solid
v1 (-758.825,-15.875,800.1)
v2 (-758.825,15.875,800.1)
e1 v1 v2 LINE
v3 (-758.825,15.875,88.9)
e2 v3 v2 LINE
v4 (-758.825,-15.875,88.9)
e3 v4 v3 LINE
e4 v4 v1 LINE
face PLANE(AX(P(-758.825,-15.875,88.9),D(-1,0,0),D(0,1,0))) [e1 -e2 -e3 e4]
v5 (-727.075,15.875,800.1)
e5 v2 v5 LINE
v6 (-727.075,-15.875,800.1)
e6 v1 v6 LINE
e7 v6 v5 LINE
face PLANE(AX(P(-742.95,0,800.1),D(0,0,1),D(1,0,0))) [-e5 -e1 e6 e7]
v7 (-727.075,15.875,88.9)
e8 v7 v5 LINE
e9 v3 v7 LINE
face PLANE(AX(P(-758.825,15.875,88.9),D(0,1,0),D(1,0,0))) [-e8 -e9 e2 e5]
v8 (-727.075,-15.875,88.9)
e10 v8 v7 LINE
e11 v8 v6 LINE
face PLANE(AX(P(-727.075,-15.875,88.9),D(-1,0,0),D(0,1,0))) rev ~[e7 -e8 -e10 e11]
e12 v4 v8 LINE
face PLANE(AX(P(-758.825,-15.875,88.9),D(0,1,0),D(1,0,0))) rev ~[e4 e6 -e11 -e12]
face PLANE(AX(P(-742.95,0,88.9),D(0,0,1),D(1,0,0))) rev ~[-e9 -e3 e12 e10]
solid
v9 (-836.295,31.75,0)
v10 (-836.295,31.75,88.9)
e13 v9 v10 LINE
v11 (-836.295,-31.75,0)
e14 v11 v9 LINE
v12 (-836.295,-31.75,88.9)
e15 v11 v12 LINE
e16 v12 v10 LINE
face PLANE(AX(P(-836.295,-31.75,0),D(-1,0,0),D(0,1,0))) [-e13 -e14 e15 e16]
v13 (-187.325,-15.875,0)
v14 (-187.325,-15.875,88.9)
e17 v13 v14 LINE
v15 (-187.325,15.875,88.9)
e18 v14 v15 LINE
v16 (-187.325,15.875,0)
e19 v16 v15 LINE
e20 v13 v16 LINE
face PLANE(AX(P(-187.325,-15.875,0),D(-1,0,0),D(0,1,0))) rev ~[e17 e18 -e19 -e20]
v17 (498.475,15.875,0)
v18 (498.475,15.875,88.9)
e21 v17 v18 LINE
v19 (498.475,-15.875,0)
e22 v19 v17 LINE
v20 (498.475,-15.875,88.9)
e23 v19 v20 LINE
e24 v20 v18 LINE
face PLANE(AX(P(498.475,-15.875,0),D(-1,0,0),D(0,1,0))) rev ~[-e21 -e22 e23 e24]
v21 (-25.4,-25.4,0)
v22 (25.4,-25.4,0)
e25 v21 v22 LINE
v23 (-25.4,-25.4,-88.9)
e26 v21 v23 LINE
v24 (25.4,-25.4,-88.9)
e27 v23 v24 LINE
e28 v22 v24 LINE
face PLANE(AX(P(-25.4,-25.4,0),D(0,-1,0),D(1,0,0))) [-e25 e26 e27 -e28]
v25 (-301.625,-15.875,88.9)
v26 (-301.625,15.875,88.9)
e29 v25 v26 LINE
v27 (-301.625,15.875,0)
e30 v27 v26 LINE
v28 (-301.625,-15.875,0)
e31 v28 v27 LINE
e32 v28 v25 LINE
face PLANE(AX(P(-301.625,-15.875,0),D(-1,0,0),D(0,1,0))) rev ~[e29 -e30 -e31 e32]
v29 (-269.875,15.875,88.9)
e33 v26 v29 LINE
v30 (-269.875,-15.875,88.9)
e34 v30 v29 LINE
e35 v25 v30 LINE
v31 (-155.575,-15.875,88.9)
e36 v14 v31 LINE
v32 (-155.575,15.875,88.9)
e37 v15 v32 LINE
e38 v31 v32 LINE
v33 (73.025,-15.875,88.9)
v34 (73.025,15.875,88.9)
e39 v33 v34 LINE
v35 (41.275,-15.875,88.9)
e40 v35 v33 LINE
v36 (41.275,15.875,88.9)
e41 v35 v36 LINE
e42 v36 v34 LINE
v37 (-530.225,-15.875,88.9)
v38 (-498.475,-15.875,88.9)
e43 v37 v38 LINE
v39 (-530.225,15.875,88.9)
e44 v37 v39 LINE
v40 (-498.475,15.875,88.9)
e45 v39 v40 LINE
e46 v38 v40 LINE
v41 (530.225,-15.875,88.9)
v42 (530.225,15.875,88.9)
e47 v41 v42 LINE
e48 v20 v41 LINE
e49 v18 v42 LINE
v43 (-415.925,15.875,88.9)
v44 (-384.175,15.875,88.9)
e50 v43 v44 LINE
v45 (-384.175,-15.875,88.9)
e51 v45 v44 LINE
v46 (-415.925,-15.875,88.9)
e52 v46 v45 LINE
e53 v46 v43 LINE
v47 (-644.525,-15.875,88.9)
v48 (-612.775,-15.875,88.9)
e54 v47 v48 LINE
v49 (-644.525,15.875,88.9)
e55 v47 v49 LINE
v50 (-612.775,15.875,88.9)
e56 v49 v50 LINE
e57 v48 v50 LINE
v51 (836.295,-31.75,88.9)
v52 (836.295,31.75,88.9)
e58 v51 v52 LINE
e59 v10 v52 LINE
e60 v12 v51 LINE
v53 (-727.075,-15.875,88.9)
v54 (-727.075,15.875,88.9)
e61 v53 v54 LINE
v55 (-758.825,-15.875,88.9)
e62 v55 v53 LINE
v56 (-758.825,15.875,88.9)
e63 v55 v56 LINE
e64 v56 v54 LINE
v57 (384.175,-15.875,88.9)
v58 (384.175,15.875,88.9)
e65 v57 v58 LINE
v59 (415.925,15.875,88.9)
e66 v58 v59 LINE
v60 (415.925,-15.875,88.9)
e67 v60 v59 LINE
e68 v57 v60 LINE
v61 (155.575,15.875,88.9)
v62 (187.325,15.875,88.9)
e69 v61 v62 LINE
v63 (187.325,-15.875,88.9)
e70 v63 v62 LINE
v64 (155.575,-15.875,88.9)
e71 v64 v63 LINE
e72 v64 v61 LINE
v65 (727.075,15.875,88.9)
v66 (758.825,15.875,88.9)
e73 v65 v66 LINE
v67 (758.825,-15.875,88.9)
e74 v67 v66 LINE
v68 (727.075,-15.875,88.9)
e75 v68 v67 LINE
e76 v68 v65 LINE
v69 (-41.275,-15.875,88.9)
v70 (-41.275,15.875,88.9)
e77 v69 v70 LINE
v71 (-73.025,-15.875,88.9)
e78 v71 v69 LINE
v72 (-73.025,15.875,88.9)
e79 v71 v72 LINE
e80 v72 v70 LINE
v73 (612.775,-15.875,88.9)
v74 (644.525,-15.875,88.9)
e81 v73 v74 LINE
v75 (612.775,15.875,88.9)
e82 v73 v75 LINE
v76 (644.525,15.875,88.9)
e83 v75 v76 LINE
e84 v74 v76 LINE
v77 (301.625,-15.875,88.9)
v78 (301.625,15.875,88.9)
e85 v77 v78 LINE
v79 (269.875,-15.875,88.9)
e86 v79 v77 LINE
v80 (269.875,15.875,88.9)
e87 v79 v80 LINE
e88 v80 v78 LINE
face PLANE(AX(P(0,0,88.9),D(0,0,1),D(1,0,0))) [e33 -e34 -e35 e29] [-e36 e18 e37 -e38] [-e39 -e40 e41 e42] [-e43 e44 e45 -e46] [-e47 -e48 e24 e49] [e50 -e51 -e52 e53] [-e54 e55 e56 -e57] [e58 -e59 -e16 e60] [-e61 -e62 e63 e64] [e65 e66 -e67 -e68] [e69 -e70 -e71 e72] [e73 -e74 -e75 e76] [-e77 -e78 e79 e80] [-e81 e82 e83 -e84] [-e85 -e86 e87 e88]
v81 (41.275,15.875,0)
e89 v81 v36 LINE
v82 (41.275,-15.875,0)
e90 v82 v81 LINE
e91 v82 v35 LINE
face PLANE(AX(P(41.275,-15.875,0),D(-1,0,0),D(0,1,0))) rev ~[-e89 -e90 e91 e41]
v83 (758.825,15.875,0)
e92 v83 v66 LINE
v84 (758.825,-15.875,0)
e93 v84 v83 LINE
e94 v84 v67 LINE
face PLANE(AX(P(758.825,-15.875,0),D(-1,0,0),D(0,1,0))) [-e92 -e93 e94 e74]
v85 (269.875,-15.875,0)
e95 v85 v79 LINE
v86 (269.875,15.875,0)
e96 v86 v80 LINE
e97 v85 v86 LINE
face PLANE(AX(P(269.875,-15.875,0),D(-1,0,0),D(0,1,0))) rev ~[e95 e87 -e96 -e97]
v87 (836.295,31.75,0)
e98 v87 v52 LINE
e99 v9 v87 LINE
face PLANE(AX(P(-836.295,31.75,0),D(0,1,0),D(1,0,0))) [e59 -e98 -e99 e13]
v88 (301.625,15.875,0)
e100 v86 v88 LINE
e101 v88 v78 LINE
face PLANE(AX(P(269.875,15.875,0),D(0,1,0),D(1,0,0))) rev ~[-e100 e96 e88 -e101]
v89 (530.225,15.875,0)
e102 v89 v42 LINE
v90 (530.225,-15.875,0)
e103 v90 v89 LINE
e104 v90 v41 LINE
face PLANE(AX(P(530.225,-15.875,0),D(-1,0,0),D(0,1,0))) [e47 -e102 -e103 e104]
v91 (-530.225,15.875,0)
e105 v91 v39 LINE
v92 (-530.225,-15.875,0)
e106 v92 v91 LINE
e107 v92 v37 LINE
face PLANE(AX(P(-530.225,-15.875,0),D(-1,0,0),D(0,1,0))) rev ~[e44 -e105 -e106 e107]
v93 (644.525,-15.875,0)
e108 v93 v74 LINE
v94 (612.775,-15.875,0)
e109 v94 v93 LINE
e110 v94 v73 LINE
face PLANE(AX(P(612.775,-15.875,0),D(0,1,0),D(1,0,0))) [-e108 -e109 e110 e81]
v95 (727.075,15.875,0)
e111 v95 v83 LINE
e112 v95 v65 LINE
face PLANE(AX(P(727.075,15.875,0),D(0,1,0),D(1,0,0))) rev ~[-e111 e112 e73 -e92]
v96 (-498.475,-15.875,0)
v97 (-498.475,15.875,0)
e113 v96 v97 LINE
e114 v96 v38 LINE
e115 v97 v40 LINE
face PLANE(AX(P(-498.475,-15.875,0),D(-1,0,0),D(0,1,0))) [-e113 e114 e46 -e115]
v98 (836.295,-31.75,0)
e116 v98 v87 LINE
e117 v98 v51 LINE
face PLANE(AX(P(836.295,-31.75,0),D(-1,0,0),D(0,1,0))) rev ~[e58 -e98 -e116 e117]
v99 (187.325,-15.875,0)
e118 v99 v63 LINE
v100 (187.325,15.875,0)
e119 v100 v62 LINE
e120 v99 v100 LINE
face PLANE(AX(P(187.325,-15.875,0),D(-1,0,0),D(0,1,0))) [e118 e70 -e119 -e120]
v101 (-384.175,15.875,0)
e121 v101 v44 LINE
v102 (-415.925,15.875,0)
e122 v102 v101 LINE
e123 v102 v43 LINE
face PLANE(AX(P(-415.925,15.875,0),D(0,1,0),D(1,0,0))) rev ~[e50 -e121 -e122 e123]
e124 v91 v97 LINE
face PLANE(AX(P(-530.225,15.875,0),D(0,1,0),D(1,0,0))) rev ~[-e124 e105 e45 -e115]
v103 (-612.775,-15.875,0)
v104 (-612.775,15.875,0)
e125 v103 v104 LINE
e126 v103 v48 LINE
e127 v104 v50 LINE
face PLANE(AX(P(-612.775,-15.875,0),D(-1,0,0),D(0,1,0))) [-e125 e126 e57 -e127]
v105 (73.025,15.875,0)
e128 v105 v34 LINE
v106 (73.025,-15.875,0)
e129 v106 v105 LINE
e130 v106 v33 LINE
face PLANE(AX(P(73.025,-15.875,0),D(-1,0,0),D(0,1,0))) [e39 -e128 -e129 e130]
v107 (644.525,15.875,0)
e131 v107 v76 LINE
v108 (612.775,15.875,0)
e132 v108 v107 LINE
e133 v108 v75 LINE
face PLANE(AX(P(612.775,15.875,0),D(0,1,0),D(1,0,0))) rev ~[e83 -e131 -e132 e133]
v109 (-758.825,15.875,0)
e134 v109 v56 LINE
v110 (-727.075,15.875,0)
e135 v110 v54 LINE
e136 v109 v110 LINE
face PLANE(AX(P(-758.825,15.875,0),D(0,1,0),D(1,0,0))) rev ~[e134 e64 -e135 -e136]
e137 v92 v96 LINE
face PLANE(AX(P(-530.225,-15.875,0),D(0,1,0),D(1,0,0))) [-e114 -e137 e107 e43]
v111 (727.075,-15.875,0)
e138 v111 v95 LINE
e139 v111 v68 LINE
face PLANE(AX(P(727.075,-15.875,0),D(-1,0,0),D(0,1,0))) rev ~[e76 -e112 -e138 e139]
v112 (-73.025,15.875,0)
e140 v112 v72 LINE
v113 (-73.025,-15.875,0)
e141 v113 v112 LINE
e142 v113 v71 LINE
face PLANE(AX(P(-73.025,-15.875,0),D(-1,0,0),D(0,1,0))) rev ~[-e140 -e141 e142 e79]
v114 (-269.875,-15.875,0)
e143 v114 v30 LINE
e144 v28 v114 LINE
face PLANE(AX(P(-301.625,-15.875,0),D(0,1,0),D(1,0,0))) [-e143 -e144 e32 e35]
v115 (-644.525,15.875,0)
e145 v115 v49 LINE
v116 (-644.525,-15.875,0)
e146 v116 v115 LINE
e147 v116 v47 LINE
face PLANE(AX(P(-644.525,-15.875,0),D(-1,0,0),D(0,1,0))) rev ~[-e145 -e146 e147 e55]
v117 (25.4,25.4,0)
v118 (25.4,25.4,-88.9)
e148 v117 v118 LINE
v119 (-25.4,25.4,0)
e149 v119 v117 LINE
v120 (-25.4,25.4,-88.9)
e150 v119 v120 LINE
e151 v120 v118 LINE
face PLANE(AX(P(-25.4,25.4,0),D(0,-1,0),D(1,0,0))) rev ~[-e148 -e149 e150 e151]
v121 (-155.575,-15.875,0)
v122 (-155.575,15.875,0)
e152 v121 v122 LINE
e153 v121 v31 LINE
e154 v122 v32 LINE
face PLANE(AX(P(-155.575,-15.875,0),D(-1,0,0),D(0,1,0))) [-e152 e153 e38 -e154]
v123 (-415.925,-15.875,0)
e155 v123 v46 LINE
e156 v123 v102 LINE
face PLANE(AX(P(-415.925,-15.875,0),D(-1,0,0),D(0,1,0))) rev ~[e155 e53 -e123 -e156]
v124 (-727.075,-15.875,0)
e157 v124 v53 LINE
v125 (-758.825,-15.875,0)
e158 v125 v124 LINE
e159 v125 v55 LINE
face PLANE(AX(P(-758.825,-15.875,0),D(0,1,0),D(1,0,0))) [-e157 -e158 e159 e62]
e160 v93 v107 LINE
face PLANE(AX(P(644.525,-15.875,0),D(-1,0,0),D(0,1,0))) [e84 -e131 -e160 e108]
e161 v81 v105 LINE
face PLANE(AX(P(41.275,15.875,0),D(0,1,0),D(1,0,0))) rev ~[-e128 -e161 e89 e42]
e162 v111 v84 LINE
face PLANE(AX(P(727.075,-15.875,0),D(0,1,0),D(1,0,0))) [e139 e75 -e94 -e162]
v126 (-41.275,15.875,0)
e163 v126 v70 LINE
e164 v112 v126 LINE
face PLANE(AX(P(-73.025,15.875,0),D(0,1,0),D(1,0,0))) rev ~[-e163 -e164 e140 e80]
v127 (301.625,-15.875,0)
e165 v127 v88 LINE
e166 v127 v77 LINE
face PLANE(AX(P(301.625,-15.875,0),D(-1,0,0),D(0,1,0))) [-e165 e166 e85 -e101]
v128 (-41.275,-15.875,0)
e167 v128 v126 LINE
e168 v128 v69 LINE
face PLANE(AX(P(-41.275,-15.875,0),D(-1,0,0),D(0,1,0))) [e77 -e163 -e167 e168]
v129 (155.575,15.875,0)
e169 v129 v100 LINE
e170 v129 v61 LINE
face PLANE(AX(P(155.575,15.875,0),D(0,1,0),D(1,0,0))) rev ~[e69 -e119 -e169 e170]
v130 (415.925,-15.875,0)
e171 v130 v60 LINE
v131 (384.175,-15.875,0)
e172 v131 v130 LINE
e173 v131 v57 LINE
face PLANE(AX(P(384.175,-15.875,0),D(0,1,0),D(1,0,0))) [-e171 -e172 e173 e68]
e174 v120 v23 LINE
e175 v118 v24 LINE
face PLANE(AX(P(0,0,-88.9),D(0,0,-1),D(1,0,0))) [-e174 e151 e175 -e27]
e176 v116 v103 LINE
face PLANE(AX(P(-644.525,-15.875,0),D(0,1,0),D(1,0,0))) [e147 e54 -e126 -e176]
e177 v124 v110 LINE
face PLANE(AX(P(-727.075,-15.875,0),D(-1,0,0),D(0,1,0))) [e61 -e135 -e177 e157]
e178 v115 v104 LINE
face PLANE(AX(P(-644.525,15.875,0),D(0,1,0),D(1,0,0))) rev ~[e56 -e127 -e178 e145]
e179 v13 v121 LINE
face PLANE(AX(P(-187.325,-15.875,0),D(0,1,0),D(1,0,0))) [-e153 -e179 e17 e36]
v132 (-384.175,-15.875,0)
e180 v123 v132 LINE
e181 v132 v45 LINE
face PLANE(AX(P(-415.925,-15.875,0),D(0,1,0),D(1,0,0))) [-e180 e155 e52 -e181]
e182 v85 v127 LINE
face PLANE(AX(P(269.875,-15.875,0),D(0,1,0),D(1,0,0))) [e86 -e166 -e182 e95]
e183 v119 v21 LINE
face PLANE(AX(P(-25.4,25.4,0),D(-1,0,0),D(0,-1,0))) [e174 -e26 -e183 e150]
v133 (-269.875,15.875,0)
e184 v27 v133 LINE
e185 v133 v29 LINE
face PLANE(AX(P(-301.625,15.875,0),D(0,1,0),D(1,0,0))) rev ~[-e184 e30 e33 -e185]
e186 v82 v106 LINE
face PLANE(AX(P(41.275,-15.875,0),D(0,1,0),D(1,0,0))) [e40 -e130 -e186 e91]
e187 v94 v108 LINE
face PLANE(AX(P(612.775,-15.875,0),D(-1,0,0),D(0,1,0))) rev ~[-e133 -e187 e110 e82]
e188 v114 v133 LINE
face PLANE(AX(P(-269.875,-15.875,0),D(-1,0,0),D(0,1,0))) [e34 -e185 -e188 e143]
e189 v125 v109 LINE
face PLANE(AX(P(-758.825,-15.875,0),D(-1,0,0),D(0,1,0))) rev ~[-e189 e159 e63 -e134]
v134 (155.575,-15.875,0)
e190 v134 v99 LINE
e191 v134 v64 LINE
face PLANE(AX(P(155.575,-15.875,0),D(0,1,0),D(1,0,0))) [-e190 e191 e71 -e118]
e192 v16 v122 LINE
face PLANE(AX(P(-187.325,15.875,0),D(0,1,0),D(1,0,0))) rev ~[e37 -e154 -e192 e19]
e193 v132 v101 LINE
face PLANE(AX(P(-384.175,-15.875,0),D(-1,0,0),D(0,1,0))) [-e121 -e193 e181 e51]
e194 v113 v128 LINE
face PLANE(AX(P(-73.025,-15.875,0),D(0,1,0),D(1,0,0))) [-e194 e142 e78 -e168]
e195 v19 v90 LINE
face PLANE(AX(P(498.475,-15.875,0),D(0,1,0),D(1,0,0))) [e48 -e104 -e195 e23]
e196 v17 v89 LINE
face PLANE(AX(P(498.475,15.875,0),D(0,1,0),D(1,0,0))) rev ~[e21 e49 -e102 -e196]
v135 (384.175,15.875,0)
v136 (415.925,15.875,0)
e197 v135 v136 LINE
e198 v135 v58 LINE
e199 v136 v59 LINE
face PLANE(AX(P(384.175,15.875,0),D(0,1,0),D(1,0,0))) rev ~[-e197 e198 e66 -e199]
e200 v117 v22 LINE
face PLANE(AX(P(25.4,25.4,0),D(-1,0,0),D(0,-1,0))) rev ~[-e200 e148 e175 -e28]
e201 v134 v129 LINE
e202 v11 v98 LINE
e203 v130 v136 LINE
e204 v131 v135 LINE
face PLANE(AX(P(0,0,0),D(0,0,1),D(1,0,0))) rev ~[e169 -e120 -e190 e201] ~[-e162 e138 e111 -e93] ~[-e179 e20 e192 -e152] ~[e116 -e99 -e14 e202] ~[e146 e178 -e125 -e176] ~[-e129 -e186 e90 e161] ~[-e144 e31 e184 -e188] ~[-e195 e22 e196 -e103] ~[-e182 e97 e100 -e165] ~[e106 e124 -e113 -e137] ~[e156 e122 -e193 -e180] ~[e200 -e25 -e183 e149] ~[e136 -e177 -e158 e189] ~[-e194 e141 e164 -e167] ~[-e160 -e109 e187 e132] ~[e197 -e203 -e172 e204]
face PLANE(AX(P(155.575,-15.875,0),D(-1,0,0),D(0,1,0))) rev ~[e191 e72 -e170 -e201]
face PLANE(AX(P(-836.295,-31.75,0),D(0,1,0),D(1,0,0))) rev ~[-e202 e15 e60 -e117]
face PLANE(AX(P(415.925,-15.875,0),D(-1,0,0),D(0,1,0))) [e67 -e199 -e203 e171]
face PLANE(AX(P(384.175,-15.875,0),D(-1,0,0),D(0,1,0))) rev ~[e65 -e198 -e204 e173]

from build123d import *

# Parameters (mm, degrees)
F0_W     = 1672.59
F0_H     = 63.5
F0_W_2   = 31.75
F0_H_2   = 31.75
F1_DEPTH = 88.9
F3_W     = 50.8
F3_H     = 50.8
F4_DEPTH = 88.9
F2_W     = 31.75
F2_H     = 31.75
F5_DEPTH = 711.2


with BuildPart() as f1:
    # F0 (on Top) → F1 (new body)
    with BuildSketch(Plane.XY):
        Rectangle(F0_W, F0_H)
        with Locations((-742.95, 0)):
            Rectangle(F0_W_2, F0_H_2, mode=Mode.SUBTRACT)
        with Locations((-628.65, 0)):
            Rectangle(F0_W_2, F0_H_2, mode=Mode.SUBTRACT)
        with Locations((-514.35, 0)):
            Rectangle(F0_W_2, F0_H_2, mode=Mode.SUBTRACT)
        with Locations((-400.05, 0)):
            Rectangle(F0_W_2, F0_H_2, mode=Mode.SUBTRACT)
        with Locations((-285.75, 0)):
            Rectangle(F0_W_2, F0_H_2, mode=Mode.SUBTRACT)
        with Locations((-171.45, 0)):
            Rectangle(F0_W_2, F0_H_2, mode=Mode.SUBTRACT)
        with Locations((-57.15, 0)):
            Rectangle(F0_W_2, F0_H_2, mode=Mode.SUBTRACT)
        with Locations((57.15, 0)):
            Rectangle(F0_W_2, F0_H_2, mode=Mode.SUBTRACT)
        with Locations((171.45, 0)):
            Rectangle(F0_W_2, F0_H_2, mode=Mode.SUBTRACT)
        with Locations((285.75, 0)):
            Rectangle(F0_W_2, F0_H_2, mode=Mode.SUBTRACT)
        with Locations((400.05, 0)):
            Rectangle(F0_W_2, F0_H_2, mode=Mode.SUBTRACT)
        with Locations((514.35, 0)):
            Rectangle(F0_W_2, F0_H_2, mode=Mode.SUBTRACT)
        with Locations((628.65, 0)):
            Rectangle(F0_W_2, F0_H_2, mode=Mode.SUBTRACT)
        with Locations((742.95, 0)):
            Rectangle(F0_W_2, F0_H_2, mode=Mode.SUBTRACT)
    extrude(amount=F1_DEPTH)

    # F3 (on face) → F4 (join)
    with BuildSketch(Plane(origin=(0, 0, 0), x_dir=(1, 0, 0), z_dir=(0, 0, -1))):
        Rectangle(F3_W, F3_H)
    extrude(amount=F4_DEPTH)


with BuildPart() as f5:
    # F2 (on face) → F5 (new body)
    with BuildSketch(Plane.XY.offset(88.9)):
        with Locations((-742.95, 0)):
            Rectangle(F2_W, F2_H)
    extrude(amount=F5_DEPTH)


solid = Compound([f1.part, f5.part])
